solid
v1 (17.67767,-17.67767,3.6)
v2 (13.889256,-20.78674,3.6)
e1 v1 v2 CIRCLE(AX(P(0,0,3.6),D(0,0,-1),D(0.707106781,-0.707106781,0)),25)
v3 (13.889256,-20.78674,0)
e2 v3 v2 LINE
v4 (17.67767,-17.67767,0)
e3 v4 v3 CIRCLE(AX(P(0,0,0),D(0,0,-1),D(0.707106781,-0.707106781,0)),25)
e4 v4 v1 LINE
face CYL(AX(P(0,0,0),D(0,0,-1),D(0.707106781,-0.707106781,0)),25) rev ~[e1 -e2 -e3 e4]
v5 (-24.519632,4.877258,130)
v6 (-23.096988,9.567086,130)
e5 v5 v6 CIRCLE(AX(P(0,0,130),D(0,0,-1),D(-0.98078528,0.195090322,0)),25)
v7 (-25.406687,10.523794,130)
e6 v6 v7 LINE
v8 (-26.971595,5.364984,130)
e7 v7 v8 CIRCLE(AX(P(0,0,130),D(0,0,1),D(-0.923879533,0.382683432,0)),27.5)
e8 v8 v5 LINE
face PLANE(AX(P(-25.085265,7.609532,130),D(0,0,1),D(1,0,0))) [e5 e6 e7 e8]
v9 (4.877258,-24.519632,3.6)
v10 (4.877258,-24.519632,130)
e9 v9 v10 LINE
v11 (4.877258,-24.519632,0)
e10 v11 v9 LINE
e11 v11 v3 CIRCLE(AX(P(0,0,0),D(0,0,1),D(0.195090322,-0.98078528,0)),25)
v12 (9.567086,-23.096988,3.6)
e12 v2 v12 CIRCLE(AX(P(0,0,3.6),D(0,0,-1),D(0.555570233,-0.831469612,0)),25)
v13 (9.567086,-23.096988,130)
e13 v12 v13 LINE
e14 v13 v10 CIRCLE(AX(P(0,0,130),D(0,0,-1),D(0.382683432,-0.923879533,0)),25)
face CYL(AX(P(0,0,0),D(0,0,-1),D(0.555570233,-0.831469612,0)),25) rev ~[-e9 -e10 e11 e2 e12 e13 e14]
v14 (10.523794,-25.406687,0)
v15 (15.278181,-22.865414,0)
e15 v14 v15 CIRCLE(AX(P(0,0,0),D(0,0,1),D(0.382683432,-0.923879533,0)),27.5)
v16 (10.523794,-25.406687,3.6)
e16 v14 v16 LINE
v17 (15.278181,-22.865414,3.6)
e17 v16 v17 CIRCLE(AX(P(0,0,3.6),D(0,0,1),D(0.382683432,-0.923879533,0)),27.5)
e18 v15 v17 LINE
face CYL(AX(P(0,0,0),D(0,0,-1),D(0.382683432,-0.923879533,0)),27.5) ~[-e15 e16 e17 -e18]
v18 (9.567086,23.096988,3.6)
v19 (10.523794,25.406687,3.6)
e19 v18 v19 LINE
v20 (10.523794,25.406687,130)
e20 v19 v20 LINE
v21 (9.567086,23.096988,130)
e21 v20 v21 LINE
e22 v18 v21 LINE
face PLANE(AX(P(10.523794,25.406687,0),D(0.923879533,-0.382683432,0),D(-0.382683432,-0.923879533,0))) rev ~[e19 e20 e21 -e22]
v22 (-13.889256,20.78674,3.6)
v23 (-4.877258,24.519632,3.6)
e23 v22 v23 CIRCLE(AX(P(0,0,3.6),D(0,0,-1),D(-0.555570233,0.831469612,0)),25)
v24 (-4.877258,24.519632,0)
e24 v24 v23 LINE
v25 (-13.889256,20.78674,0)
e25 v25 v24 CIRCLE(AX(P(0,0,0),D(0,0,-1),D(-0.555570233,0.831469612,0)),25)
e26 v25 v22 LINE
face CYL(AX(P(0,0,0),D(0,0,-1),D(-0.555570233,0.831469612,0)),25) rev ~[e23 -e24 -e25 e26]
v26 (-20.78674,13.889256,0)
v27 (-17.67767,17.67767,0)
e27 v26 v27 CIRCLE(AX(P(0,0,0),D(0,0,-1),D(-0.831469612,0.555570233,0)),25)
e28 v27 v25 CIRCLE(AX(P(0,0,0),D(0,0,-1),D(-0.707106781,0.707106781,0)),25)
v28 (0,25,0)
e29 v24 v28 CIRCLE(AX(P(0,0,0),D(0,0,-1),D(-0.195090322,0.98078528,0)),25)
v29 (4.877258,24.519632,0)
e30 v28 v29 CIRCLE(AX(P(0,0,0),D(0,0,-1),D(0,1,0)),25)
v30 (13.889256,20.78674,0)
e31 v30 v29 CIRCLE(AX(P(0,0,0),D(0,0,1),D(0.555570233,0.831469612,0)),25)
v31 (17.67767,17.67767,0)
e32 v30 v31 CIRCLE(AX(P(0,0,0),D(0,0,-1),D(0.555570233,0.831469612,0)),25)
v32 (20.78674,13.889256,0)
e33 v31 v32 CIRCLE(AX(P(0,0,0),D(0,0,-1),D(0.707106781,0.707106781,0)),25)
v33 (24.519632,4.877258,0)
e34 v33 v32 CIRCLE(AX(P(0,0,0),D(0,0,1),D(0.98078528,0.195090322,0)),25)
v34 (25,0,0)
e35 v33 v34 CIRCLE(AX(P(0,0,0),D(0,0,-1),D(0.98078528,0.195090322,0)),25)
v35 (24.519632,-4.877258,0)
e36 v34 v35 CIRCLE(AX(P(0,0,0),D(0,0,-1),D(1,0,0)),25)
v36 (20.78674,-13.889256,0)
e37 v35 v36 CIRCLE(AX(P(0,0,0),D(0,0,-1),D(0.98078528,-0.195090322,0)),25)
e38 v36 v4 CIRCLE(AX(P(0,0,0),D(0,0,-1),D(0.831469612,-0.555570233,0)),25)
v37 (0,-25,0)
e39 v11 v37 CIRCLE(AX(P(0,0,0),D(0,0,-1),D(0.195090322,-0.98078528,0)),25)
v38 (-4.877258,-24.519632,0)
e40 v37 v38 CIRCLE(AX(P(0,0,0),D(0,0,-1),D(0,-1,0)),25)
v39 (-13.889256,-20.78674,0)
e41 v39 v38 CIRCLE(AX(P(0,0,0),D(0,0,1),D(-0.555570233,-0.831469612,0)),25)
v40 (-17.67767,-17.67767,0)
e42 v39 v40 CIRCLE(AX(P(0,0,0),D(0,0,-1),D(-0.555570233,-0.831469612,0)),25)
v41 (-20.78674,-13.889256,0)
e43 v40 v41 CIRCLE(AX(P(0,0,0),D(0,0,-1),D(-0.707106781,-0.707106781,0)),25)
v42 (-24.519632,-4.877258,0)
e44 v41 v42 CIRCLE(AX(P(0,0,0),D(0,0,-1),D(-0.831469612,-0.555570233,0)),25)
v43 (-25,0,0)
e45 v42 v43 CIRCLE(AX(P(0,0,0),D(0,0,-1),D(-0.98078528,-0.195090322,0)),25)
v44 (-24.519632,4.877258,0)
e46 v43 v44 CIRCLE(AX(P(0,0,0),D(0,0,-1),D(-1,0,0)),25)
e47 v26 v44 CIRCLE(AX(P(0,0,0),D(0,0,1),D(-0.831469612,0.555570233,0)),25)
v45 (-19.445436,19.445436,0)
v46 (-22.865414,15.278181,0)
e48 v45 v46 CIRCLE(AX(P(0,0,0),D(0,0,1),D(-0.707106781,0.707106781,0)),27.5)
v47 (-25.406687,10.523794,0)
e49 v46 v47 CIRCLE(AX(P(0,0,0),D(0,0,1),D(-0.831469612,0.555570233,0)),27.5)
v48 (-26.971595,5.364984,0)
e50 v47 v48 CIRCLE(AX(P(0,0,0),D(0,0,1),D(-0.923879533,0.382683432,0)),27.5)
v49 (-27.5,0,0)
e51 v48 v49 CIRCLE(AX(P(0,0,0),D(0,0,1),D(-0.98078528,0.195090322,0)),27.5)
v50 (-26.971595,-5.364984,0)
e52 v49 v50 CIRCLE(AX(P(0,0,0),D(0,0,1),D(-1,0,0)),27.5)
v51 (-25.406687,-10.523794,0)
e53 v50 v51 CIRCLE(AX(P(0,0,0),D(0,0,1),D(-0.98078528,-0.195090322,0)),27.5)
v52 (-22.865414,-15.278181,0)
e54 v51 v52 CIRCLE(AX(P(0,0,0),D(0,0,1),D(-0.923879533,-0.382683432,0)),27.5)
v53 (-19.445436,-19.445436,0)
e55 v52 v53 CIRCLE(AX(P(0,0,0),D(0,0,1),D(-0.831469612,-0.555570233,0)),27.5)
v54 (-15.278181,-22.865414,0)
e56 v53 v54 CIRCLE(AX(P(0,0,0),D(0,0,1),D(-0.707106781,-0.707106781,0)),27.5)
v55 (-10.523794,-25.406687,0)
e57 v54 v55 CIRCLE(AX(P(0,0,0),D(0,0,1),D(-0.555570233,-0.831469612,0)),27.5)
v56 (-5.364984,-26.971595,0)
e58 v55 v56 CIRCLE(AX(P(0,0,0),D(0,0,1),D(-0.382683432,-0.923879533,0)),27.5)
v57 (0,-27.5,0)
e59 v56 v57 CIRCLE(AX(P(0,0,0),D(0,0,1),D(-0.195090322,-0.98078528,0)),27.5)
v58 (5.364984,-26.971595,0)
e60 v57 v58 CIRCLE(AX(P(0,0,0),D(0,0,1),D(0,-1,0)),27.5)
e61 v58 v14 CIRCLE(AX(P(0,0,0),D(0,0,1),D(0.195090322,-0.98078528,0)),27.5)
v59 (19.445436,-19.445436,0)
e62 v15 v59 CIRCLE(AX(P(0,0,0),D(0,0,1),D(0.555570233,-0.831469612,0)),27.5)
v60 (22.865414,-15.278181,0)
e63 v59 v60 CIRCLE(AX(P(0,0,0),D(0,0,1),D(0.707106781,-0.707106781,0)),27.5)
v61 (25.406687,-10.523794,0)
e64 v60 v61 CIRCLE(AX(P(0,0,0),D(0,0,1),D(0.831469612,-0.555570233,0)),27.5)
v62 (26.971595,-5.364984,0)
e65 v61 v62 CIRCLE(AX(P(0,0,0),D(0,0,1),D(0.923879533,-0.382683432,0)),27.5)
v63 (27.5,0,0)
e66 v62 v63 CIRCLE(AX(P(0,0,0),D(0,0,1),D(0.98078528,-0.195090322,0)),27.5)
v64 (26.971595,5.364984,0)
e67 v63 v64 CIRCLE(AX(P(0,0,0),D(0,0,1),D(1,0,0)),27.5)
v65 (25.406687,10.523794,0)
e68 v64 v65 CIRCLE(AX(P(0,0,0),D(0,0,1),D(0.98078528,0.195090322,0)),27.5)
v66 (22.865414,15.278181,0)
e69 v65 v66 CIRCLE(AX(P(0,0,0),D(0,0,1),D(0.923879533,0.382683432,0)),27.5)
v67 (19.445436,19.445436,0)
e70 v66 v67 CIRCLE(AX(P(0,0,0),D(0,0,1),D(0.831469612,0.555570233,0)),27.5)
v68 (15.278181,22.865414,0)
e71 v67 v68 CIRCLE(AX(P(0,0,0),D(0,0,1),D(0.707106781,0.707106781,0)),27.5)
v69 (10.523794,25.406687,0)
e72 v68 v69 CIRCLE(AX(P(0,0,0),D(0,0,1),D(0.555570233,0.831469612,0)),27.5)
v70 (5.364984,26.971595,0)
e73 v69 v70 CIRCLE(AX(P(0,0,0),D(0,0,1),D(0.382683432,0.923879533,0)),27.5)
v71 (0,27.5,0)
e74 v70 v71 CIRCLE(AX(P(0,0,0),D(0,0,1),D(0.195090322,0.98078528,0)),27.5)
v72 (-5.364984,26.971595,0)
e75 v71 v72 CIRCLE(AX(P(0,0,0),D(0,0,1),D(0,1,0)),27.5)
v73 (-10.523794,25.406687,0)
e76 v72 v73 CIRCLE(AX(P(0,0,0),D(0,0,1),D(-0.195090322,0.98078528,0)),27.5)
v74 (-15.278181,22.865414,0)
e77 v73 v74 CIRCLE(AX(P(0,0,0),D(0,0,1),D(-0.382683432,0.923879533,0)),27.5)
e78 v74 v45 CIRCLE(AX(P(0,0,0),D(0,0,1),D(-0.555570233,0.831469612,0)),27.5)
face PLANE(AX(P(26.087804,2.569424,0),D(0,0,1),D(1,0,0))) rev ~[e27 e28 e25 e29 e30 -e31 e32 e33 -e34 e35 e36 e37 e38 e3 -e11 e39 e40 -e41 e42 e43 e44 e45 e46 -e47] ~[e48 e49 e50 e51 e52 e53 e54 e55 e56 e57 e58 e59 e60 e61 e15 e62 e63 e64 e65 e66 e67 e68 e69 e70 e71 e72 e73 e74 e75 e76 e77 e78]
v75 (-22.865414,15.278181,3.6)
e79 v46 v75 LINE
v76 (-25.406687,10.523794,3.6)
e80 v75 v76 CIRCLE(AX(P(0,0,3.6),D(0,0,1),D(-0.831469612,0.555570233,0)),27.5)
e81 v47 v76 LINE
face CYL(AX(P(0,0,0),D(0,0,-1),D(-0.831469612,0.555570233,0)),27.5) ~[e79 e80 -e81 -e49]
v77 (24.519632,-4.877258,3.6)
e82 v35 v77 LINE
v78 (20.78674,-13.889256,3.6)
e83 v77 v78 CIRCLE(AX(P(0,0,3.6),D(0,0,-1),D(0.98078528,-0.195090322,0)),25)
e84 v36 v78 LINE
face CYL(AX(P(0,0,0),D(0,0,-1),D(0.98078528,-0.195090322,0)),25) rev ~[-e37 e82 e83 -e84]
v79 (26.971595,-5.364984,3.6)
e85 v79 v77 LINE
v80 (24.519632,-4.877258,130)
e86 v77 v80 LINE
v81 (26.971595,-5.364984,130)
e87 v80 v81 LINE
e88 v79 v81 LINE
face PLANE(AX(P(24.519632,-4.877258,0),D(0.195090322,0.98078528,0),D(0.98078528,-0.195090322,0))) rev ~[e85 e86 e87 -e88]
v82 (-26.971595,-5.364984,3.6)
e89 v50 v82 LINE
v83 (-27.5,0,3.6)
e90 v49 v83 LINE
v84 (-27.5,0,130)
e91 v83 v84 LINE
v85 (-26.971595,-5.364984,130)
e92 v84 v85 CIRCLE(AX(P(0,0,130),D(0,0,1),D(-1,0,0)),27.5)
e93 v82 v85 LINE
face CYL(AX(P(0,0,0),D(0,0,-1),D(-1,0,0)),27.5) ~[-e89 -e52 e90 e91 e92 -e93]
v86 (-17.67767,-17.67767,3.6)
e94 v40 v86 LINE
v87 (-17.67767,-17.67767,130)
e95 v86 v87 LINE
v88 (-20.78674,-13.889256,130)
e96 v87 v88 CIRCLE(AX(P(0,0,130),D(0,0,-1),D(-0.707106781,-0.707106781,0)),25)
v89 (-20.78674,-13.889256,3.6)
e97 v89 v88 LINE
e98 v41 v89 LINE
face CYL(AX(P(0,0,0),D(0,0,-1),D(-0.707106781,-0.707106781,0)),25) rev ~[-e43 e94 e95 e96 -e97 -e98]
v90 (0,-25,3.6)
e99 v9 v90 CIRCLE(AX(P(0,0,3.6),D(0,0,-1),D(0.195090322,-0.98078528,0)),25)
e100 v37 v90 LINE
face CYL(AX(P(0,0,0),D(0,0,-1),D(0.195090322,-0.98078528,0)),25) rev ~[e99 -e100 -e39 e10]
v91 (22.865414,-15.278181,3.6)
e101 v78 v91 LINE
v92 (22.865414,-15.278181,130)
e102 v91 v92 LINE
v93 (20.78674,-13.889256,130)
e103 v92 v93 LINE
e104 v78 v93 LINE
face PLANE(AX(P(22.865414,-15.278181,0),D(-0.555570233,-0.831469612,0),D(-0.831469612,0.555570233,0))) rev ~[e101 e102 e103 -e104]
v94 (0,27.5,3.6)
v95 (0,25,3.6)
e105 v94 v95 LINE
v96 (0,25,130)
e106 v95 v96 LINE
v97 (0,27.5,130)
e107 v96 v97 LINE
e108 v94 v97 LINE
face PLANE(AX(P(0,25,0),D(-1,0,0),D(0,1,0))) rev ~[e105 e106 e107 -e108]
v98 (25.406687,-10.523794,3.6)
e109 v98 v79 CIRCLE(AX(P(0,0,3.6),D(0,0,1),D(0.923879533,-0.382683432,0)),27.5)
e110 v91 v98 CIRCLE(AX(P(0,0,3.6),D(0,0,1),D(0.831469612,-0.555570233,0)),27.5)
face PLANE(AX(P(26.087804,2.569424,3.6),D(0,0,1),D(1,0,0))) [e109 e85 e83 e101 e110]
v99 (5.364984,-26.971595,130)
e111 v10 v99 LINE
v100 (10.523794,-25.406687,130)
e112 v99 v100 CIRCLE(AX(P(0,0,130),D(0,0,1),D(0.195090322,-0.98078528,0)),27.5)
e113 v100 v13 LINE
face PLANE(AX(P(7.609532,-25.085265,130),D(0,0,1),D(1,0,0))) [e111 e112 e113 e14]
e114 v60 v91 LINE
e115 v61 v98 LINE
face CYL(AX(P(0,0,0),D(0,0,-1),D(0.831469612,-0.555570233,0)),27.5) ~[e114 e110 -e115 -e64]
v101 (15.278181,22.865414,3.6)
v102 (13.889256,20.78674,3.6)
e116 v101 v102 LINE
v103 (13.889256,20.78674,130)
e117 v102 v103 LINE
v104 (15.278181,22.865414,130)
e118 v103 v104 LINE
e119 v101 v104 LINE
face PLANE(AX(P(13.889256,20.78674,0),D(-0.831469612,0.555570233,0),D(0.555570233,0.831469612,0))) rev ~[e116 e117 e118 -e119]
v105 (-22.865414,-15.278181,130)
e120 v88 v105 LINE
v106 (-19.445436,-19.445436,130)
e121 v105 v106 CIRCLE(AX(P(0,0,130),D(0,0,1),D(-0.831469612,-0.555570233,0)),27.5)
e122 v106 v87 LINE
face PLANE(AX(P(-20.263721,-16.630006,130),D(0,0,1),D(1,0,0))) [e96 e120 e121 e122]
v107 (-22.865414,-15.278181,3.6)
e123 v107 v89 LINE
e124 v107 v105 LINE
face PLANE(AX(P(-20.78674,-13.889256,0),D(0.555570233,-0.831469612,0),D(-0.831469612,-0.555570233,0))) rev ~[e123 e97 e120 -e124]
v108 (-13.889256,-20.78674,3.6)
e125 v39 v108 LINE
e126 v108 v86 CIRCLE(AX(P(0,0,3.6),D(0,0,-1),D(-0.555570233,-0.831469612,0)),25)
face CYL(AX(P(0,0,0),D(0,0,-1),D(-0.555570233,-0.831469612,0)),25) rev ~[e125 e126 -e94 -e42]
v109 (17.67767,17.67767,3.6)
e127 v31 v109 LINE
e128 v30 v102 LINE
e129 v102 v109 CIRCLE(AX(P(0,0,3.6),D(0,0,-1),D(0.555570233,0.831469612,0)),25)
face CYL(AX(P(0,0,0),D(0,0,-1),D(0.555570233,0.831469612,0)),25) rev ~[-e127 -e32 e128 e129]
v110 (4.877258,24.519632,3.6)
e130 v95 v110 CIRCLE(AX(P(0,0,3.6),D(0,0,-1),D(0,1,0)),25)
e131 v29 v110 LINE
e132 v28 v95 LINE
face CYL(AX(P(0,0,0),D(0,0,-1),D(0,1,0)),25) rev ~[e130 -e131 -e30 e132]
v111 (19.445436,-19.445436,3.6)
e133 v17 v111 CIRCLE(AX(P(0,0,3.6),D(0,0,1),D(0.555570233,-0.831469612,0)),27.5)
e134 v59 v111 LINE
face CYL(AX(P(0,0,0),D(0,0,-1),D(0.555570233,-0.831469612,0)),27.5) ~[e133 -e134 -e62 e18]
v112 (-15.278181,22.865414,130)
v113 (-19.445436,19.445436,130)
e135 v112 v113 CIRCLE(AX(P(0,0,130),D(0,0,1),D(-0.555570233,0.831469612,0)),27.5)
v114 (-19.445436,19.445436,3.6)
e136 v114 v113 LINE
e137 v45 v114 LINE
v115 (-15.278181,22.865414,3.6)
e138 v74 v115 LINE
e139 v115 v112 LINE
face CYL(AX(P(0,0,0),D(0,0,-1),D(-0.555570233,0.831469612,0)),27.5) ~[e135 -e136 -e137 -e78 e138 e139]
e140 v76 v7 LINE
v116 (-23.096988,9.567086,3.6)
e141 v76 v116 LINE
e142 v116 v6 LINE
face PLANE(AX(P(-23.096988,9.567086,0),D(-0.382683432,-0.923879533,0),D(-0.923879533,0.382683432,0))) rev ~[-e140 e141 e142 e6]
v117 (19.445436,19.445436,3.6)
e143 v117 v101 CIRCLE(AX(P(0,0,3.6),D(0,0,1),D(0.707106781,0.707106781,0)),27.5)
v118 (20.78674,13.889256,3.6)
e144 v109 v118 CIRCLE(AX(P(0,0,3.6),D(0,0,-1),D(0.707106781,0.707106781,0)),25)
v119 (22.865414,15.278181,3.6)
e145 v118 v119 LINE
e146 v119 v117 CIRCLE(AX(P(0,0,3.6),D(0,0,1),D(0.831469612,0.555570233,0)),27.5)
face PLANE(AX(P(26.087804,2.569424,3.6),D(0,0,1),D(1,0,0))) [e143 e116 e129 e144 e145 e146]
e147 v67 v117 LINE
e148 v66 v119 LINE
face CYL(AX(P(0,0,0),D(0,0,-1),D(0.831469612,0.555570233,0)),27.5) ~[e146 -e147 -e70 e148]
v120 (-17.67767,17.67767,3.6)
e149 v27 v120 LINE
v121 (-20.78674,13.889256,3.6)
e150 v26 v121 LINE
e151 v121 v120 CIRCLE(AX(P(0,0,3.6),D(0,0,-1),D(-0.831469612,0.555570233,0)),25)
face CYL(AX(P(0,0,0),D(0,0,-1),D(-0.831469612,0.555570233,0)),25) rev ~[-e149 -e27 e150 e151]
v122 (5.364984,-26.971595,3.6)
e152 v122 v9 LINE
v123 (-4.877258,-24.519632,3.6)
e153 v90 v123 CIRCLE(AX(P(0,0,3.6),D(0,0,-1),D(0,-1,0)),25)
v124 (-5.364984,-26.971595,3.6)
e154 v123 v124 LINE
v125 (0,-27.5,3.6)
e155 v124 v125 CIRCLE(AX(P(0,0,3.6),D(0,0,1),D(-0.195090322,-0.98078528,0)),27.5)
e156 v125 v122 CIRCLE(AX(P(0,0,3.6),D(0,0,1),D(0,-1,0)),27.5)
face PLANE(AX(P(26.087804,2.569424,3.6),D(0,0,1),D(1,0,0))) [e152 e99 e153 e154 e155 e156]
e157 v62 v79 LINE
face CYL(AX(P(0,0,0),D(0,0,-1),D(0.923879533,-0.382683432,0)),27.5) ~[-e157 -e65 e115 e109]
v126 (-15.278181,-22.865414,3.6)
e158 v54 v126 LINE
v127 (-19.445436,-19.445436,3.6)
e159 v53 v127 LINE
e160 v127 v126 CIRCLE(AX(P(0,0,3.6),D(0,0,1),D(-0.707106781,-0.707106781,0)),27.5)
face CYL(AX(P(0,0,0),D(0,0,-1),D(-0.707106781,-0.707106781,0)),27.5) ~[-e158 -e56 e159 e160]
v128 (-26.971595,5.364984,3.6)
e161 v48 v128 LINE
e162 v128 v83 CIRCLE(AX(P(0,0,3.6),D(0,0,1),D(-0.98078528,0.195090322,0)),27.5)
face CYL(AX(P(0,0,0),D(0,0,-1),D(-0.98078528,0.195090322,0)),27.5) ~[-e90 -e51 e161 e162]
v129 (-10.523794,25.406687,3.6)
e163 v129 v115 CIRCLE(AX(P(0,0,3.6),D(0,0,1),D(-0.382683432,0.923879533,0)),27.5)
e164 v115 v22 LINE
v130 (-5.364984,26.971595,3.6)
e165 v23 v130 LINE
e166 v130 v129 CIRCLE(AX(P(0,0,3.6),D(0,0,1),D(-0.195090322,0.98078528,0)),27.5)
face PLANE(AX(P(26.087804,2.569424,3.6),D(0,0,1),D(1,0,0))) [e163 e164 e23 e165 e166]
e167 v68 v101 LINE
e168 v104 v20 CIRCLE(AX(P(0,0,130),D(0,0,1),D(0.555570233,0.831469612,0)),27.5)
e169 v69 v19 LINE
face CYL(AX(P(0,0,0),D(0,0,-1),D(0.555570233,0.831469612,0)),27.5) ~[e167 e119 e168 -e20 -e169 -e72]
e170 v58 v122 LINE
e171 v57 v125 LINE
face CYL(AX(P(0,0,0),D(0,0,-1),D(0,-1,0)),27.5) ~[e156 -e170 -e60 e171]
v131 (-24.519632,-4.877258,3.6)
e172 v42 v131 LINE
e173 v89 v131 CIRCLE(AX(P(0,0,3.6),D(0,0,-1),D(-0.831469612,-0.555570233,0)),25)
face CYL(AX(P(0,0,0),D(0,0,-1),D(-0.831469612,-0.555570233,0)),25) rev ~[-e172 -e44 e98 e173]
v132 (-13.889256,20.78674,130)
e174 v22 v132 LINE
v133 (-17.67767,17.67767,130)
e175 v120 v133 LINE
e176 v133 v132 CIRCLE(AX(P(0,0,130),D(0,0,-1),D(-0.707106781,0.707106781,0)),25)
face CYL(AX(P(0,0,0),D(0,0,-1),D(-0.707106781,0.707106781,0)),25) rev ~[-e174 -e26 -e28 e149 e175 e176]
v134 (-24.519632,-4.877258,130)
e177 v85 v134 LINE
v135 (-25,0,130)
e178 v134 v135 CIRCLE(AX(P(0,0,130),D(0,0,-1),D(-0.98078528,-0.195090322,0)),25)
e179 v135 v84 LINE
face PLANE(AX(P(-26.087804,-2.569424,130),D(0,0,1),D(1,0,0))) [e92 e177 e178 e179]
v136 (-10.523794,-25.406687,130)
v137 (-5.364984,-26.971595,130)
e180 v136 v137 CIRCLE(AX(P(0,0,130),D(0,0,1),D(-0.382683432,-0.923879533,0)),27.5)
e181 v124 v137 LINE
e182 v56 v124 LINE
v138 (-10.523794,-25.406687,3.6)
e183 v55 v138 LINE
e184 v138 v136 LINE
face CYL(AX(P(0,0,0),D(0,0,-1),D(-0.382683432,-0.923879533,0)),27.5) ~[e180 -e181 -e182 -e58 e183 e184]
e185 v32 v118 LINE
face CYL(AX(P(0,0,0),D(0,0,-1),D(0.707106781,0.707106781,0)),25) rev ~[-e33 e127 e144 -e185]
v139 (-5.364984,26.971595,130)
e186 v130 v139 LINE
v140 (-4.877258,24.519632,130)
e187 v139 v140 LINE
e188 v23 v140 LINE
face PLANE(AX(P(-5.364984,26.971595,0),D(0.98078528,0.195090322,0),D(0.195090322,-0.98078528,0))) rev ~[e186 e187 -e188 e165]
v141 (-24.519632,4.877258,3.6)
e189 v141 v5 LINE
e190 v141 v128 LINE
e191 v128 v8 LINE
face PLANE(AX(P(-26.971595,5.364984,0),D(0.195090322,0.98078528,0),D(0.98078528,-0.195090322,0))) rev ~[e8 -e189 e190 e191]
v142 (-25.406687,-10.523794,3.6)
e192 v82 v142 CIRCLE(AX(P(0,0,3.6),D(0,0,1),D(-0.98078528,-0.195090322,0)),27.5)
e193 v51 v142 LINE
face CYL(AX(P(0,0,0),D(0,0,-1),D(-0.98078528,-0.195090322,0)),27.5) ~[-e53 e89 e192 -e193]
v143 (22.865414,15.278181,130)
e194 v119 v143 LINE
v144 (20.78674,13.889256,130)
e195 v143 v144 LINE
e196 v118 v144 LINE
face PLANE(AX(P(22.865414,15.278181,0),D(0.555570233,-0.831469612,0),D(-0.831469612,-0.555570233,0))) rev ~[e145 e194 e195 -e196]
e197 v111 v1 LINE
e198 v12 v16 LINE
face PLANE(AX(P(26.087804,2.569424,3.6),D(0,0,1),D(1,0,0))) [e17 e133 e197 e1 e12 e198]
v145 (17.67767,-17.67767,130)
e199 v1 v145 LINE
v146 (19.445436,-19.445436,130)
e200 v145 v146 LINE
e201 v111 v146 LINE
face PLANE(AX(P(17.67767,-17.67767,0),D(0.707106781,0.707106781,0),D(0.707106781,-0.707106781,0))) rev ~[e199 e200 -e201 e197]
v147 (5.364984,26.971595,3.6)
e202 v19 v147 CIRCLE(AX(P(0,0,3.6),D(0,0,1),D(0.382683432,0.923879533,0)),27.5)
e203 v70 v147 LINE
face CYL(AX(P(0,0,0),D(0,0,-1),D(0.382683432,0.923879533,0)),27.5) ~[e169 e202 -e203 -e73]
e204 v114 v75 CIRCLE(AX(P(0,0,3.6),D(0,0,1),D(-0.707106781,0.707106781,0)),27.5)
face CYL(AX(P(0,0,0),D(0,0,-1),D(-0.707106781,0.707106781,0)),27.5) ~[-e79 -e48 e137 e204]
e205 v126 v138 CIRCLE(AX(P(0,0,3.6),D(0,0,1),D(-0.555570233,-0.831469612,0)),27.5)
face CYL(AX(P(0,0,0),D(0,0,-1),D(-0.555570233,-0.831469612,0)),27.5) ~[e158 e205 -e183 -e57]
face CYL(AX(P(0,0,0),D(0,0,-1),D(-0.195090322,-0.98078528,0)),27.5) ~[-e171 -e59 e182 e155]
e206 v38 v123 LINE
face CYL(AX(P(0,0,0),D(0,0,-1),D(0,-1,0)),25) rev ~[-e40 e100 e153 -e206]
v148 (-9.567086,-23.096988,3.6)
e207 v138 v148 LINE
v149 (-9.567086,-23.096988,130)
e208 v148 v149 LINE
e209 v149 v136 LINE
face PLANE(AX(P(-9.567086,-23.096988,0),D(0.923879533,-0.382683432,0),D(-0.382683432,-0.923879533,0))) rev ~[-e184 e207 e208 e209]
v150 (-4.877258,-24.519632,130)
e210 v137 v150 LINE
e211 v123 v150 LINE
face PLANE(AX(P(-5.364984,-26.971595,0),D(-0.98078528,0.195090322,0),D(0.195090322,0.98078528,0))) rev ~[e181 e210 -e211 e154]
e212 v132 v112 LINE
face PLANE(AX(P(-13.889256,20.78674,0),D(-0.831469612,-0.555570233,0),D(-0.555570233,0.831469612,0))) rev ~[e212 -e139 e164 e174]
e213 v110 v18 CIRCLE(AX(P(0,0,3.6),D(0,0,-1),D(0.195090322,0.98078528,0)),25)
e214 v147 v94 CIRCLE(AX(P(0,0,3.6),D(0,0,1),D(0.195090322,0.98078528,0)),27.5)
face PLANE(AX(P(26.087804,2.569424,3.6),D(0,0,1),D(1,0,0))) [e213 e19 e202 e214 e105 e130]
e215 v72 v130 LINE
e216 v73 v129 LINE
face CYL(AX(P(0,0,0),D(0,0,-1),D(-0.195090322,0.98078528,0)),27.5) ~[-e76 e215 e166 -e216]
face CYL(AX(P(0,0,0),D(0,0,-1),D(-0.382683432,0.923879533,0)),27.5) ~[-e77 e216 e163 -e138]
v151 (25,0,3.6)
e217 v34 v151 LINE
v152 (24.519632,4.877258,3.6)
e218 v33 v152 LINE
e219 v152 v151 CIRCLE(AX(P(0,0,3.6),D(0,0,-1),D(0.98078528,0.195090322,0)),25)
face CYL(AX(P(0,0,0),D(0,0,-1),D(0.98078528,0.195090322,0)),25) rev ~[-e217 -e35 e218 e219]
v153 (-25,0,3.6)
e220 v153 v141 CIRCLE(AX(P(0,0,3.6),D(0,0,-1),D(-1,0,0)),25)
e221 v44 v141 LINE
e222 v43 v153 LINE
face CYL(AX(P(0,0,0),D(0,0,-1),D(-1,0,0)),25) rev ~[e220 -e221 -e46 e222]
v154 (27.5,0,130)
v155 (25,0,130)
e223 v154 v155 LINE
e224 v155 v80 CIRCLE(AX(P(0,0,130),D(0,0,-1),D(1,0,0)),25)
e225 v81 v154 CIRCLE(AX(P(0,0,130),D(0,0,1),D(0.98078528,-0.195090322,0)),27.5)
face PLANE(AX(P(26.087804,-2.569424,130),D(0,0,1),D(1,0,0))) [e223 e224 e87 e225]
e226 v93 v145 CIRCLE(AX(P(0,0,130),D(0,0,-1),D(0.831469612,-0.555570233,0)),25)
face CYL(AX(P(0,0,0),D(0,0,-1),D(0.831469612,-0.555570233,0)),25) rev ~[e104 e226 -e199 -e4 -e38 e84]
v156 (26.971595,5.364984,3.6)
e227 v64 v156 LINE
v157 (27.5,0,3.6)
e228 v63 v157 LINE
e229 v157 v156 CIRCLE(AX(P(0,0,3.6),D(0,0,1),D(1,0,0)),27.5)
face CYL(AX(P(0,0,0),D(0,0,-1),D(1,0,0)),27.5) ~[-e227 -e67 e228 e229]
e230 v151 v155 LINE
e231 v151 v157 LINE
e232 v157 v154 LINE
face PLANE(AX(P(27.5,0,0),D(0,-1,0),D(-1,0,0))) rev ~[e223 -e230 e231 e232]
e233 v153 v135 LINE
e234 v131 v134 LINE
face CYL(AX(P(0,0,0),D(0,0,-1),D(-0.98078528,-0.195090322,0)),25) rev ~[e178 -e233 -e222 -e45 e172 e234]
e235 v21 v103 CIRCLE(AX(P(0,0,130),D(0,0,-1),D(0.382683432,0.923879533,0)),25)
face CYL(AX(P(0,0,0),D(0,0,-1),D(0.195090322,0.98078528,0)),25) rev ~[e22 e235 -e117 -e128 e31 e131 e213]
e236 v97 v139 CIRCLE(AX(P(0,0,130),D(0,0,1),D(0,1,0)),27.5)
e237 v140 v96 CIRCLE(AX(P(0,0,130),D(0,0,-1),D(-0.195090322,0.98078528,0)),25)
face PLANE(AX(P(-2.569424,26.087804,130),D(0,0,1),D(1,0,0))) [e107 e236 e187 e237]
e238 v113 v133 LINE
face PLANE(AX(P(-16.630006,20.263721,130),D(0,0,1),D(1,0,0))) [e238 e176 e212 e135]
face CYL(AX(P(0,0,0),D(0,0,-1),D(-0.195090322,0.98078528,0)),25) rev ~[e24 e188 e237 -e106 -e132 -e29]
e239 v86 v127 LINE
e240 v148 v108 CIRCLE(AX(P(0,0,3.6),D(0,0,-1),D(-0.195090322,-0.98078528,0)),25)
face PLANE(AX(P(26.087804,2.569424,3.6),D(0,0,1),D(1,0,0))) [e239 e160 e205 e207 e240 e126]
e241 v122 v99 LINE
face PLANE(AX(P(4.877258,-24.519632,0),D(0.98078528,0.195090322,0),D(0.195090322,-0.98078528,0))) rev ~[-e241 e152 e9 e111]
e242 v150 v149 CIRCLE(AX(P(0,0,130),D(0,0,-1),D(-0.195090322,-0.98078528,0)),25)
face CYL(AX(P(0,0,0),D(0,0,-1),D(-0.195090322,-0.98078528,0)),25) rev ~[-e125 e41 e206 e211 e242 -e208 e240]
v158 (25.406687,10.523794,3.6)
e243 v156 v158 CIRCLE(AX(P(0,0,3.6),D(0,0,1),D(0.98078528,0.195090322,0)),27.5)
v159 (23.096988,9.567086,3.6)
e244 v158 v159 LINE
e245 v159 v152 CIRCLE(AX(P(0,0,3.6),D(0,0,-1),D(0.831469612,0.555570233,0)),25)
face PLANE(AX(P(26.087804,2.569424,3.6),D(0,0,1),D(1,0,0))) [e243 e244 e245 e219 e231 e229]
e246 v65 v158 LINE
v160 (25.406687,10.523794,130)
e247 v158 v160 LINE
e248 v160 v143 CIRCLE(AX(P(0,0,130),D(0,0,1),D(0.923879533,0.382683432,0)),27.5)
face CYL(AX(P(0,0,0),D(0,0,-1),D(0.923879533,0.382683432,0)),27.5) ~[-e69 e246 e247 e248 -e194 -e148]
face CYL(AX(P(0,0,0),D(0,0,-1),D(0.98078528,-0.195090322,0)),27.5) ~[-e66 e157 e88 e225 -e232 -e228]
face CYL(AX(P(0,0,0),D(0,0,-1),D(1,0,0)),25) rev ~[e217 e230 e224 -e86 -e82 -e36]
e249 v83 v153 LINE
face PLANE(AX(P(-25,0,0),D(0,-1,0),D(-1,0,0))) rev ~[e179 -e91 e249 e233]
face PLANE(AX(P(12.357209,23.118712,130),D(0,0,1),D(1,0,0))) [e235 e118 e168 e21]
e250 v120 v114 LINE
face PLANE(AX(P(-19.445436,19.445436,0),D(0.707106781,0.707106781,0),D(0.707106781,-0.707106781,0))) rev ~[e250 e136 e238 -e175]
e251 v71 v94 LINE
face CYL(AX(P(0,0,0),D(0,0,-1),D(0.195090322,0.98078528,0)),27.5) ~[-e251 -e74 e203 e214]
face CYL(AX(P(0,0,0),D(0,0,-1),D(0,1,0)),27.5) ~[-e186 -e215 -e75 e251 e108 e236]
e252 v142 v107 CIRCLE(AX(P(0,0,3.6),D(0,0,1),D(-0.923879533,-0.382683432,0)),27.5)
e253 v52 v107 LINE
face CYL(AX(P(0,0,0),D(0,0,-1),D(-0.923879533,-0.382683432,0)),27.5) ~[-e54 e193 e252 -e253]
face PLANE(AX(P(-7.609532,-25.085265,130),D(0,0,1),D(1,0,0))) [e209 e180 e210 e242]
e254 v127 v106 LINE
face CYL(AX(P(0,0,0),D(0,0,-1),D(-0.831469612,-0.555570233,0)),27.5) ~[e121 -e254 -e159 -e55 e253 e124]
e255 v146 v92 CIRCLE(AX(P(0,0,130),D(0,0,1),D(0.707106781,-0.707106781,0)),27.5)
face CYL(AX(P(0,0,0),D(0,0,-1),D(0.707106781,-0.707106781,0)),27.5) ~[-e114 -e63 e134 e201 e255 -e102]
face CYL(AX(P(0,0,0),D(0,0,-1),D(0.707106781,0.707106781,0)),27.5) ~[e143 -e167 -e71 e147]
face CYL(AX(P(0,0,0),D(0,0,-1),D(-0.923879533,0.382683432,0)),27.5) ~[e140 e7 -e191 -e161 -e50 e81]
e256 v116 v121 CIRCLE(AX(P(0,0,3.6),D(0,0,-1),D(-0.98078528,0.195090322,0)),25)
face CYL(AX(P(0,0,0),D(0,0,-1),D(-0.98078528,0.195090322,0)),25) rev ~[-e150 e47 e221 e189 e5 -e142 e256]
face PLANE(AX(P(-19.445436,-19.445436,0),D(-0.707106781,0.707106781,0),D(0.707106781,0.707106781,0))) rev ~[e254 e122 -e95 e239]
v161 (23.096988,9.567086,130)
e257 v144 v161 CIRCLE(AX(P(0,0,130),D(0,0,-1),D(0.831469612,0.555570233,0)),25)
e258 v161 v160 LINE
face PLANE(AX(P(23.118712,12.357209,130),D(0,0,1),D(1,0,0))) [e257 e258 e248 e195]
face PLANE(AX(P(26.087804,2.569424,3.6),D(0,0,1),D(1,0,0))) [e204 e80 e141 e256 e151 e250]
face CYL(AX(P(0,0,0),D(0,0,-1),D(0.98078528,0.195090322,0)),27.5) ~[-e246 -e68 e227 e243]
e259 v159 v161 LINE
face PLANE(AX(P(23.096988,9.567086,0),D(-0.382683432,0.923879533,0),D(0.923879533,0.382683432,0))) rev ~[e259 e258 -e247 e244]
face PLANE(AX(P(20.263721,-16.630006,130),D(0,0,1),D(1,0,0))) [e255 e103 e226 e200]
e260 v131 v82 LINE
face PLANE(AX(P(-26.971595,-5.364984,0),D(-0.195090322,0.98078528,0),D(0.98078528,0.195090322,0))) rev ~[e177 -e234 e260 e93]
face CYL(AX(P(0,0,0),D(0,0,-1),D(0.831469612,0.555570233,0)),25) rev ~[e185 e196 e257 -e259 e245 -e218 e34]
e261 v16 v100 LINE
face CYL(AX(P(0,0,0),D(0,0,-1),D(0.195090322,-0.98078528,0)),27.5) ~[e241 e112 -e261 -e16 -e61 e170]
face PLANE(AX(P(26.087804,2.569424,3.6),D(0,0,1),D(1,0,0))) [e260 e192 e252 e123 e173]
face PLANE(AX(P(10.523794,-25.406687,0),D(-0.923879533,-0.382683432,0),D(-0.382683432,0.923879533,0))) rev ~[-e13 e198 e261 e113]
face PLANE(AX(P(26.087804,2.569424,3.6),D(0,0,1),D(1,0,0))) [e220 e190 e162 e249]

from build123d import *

# Parameters (mm, degrees)
F2_DEPTH = 3.6
F3_DEPTH = 130


with BuildPart() as f2:
    # F1 (on Top) → F2 (new body)
    with BuildSketch(Plane.XY):
        with BuildLine():
            Line((25, 0), (27.5, 0))
            ThreePointArc((27.5, 0), (27.3675799835, 2.6954713591), (26.9715952111, 5.3649838554))
            Line((26.9715952111, 5.3649838554), (24.5196320101, 4.8772580504))
            ThreePointArc((24.5196320101, 4.8772580504), (24.8796181668, 2.4504285082), (25, 0))
        make_face()
        with BuildLine():
            ThreePointArc((26.9715952111, -5.3649838554), (27.3675799835, -2.6954713591), (27.5, 0))
            Line((27.5, 0), (25, 0))
            ThreePointArc((25, 0), (24.8796181668, -2.4504285082), (24.5196320101, -4.8772580504))
            Line((24.5196320101, -4.8772580504), (26.9715952111, -5.3649838554))
        make_face()
        with BuildLine():
            Line((24.5196320101, 4.8772580504), (26.9715952111, 5.3649838554))
            ThreePointArc((26.9715952111, 5.3649838554), (26.3158592326, 7.9828286245), (25.4066871441, 10.52379439))
            Line((25.4066871441, 10.52379439), (23.0969883128, 9.5670858091))
            ThreePointArc((23.0969883128, 9.5670858091), (23.9235083933, 7.2571169314), (24.5196320101, 4.8772580504))
        make_face()
        with BuildLine():
            ThreePointArc((25.4066871441, -10.52379439), (26.3158592326, -7.9828286245), (26.9715952111, -5.3649838554))
            Line((26.9715952111, -5.3649838554), (24.5196320101, -4.8772580504))
            ThreePointArc((24.5196320101, -4.8772580504), (23.9235083933, -7.2571169314), (23.0969883128, -9.5670858091))
            Line((23.0969883128, -9.5670858091), (25.4066871441, -10.52379439))
        make_face()
        with BuildLine():
            Line((23.0969883128, 9.5670858091), (25.4066871441, 10.52379439))
            ThreePointArc((25.4066871441, 10.52379439), (24.2528347696, 12.9634102627), (22.8654143383, 15.278181408))
            Line((22.8654143383, 15.278181408), (20.7867403076, 13.8892558255))
            ThreePointArc((20.7867403076, 13.8892558255), (22.0480316087, 11.7849184207), (23.0969883128, 9.5670858091))
        make_face()
        with BuildLine():
            ThreePointArc((22.8654143383, -15.278181408), (24.2528347696, -12.9634102627), (25.4066871441, -10.52379439))
            Line((25.4066871441, -10.52379439), (23.0969883128, -9.5670858091))
            ThreePointArc((23.0969883128, -9.5670858091), (22.0480316087, -11.7849184207), (20.7867403076, -13.8892558255))
            Line((20.7867403076, -13.8892558255), (22.8654143383, -15.278181408))
        make_face()
        with BuildLine():
            Line((20.7867403076, 13.8892558255), (22.8654143383, 15.278181408))
            ThreePointArc((22.8654143383, 15.278181408), (21.2577874675, 17.4458153145), (19.4454364826, 19.4454364826))
            Line((19.4454364826, 19.4454364826), (17.6776695297, 17.6776695297))
            ThreePointArc((17.6776695297, 17.6776695297), (19.3252613341, 15.8598321041), (20.7867403076, 13.8892558255))
        make_face()
        with BuildLine():
            ThreePointArc((19.4454364826, -19.4454364826), (21.2577874675, -17.4458153145), (22.8654143383, -15.278181408))
            Line((22.8654143383, -15.278181408), (20.7867403076, -13.8892558255))
            ThreePointArc((20.7867403076, -13.8892558255), (19.3252613341, -15.8598321041), (17.6776695297, -17.6776695297))
            Line((17.6776695297, -17.6776695297), (19.4454364826, -19.4454364826))
        make_face()
        with BuildLine():
            Line((0, 27.5), (0, 25))
            ThreePointArc((0, 25), (2.4504285082, 24.8796181668), (4.8772580504, 24.5196320101))
            Line((4.8772580504, 24.5196320101), (5.3649838554, 26.9715952111))
            ThreePointArc((5.3649838554, 26.9715952111), (2.6954713591, 27.3675799835), (0, 27.5))
        make_face()
        with BuildLine():
            ThreePointArc((-4.8772580504, 24.5196320101), (-2.4504285082, 24.8796181668), (0, 25))
            Line((0, 25), (0, 27.5))
            ThreePointArc((0, 27.5), (-2.6954713591, 27.3675799835), (-5.3649838554, 26.9715952111))
            Line((-5.3649838554, 26.9715952111), (-4.8772580504, 24.5196320101))
        make_face()
        with BuildLine():
            Line((0, -27.5), (0, -25))
            ThreePointArc((0, -25), (-2.4504285082, -24.8796181668), (-4.8772580504, -24.5196320101))
            Line((-4.8772580504, -24.5196320101), (-5.3649838554, -26.9715952111))
            ThreePointArc((-5.3649838554, -26.9715952111), (-2.6954713591, -27.3675799835), (0, -27.5))
        make_face()
        with BuildLine():
            ThreePointArc((4.8772580504, -24.5196320101), (2.4504285082, -24.8796181668), (0, -25))
            Line((0, -25), (0, -27.5))
            ThreePointArc((0, -27.5), (2.6954713591, -27.3675799835), (5.3649838554, -26.9715952111))
            Line((5.3649838554, -26.9715952111), (4.8772580504, -24.5196320101))
        make_face()
        with BuildLine():
            Line((-27.5, 0), (-25, 0))
            ThreePointArc((-25, 0), (-24.8796181668, 2.4504285082), (-24.5196320101, 4.8772580504))
            Line((-24.5196320101, 4.8772580504), (-26.9715952111, 5.3649838554))
            ThreePointArc((-26.9715952111, 5.3649838554), (-27.3675799835, 2.6954713591), (-27.5, 0))
        make_face()
        with BuildLine():
            ThreePointArc((-24.5196320101, -4.8772580504), (-24.8796181668, -2.4504285082), (-25, 0))
            Line((-25, 0), (-27.5, 0))
            ThreePointArc((-27.5, 0), (-27.3675799835, -2.6954713591), (-26.9715952111, -5.3649838554))
            Line((-26.9715952111, -5.3649838554), (-24.5196320101, -4.8772580504))
        make_face()
        with BuildLine():
            Line((19.4454364826, -19.4454364826), (17.6776695297, -17.6776695297))
            ThreePointArc((17.6776695297, -17.6776695297), (15.8598321041, -19.3252613341), (13.8892558255, -20.7867403076))
            Line((13.8892558255, -20.7867403076), (15.278181408, -22.8654143383))
            ThreePointArc((15.278181408, -22.8654143383), (17.4458153145, -21.2577874675), (19.4454364826, -19.4454364826))
        make_face()
        with BuildLine():
            Line((10.52379439, -25.4066871441), (9.5670858091, -23.0969883128))
            ThreePointArc((9.5670858091, -23.0969883128), (7.2571169314, -23.9235083933), (4.8772580504, -24.5196320101))
            Line((4.8772580504, -24.5196320101), (5.3649838554, -26.9715952111))
            ThreePointArc((5.3649838554, -26.9715952111), (7.9828286245, -26.3158592326), (10.52379439, -25.4066871441))
        make_face()
        with BuildLine():
            ThreePointArc((13.8892558255, -20.7867403076), (11.7849184207, -22.0480316087), (9.5670858091, -23.0969883128))
            Line((9.5670858091, -23.0969883128), (10.52379439, -25.4066871441))
            ThreePointArc((10.52379439, -25.4066871441), (12.9634102627, -24.2528347696), (15.278181408, -22.8654143383))
            Line((15.278181408, -22.8654143383), (13.8892558255, -20.7867403076))
        make_face()
        with BuildLine():
            Line((-5.3649838554, -26.9715952111), (-4.8772580504, -24.5196320101))
            ThreePointArc((-4.8772580504, -24.5196320101), (-7.2571169314, -23.9235083933), (-9.5670858091, -23.0969883128))
            Line((-9.5670858091, -23.0969883128), (-10.52379439, -25.4066871441))
            ThreePointArc((-10.52379439, -25.4066871441), (-7.9828286245, -26.3158592326), (-5.3649838554, -26.9715952111))
        make_face()
        with BuildLine():
            Line((-10.52379439, -25.4066871441), (-9.5670858091, -23.0969883128))
            ThreePointArc((-9.5670858091, -23.0969883128), (-11.7849184207, -22.0480316087), (-13.8892558255, -20.7867403076))
            Line((-13.8892558255, -20.7867403076), (-15.278181408, -22.8654143383))
            ThreePointArc((-15.278181408, -22.8654143383), (-12.9634102627, -24.2528347696), (-10.52379439, -25.4066871441))
        make_face()
        with BuildLine():
            Line((-15.278181408, -22.8654143383), (-13.8892558255, -20.7867403076))
            ThreePointArc((-13.8892558255, -20.7867403076), (-15.8598321041, -19.3252613341), (-17.6776695297, -17.6776695297))
            Line((-17.6776695297, -17.6776695297), (-19.4454364826, -19.4454364826))
            ThreePointArc((-19.4454364826, -19.4454364826), (-17.4458153145, -21.2577874675), (-15.278181408, -22.8654143383))
        make_face()
        with BuildLine():
            Line((-19.4454364826, -19.4454364826), (-17.6776695297, -17.6776695297))
            ThreePointArc((-17.6776695297, -17.6776695297), (-19.3252613341, -15.8598321041), (-20.7867403076, -13.8892558255))
            Line((-20.7867403076, -13.8892558255), (-22.8654143383, -15.278181408))
            ThreePointArc((-22.8654143383, -15.278181408), (-21.2577874675, -17.4458153145), (-19.4454364826, -19.4454364826))
        make_face()
        with BuildLine():
            Line((-22.8654143383, -15.278181408), (-20.7867403076, -13.8892558255))
            ThreePointArc((-20.7867403076, -13.8892558255), (-22.0480316087, -11.7849184207), (-23.0969883128, -9.5670858091))
            Line((-23.0969883128, -9.5670858091), (-25.4066871441, -10.52379439))
            ThreePointArc((-25.4066871441, -10.52379439), (-24.2528347696, -12.9634102627), (-22.8654143383, -15.278181408))
        make_face()
        with BuildLine():
            Line((-25.4066871441, -10.52379439), (-23.0969883128, -9.5670858091))
            ThreePointArc((-23.0969883128, -9.5670858091), (-23.9235083933, -7.2571169314), (-24.5196320101, -4.8772580504))
            Line((-24.5196320101, -4.8772580504), (-26.9715952111, -5.3649838554))
            ThreePointArc((-26.9715952111, -5.3649838554), (-26.3158592326, -7.9828286245), (-25.4066871441, -10.52379439))
        make_face()
        with BuildLine():
            Line((-26.9715952111, 5.3649838554), (-24.5196320101, 4.8772580504))
            ThreePointArc((-24.5196320101, 4.8772580504), (-23.9235083933, 7.2571169314), (-23.0969883128, 9.5670858091))
            Line((-23.0969883128, 9.5670858091), (-25.4066871441, 10.52379439))
            ThreePointArc((-25.4066871441, 10.52379439), (-26.3158592326, 7.9828286245), (-26.9715952111, 5.3649838554))
        make_face()
        with BuildLine():
            Line((-25.4066871441, 10.52379439), (-23.0969883128, 9.5670858091))
            ThreePointArc((-23.0969883128, 9.5670858091), (-22.0480316087, 11.7849184207), (-20.7867403076, 13.8892558255))
            Line((-20.7867403076, 13.8892558255), (-22.8654143383, 15.278181408))
            ThreePointArc((-22.8654143383, 15.278181408), (-24.2528347696, 12.9634102627), (-25.4066871441, 10.52379439))
        make_face()
        with BuildLine():
            Line((-22.8654143383, 15.278181408), (-20.7867403076, 13.8892558255))
            ThreePointArc((-20.7867403076, 13.8892558255), (-19.3252613341, 15.8598321041), (-17.6776695297, 17.6776695297))
            Line((-17.6776695297, 17.6776695297), (-19.4454364826, 19.4454364826))
            ThreePointArc((-19.4454364826, 19.4454364826), (-21.2577874675, 17.4458153145), (-22.8654143383, 15.278181408))
        make_face()
        with BuildLine():
            Line((-19.4454364826, 19.4454364826), (-17.6776695297, 17.6776695297))
            ThreePointArc((-17.6776695297, 17.6776695297), (-15.8598321041, 19.3252613341), (-13.8892558255, 20.7867403076))
            Line((-13.8892558255, 20.7867403076), (-15.278181408, 22.8654143383))
            ThreePointArc((-15.278181408, 22.8654143383), (-17.4458153145, 21.2577874675), (-19.4454364826, 19.4454364826))
        make_face()
        with BuildLine():
            Line((-15.278181408, 22.8654143383), (-13.8892558255, 20.7867403076))
            ThreePointArc((-13.8892558255, 20.7867403076), (-11.7849184207, 22.0480316087), (-9.5670858091, 23.0969883128))
            Line((-9.5670858091, 23.0969883128), (-10.52379439, 25.4066871441))
            ThreePointArc((-10.52379439, 25.4066871441), (-12.9634102627, 24.2528347696), (-15.278181408, 22.8654143383))
        make_face()
        with BuildLine():
            Line((-10.52379439, 25.4066871441), (-9.5670858091, 23.0969883128))
            ThreePointArc((-9.5670858091, 23.0969883128), (-7.2571169314, 23.9235083933), (-4.8772580504, 24.5196320101))
            Line((-4.8772580504, 24.5196320101), (-5.3649838554, 26.9715952111))
            ThreePointArc((-5.3649838554, 26.9715952111), (-7.9828286245, 26.3158592326), (-10.52379439, 25.4066871441))
        make_face()
        with BuildLine():
            ThreePointArc((13.8892558255, 20.7867403076), (15.8598321041, 19.3252613341), (17.6776695297, 17.6776695297))
            Line((17.6776695297, 17.6776695297), (19.4454364826, 19.4454364826))
            ThreePointArc((19.4454364826, 19.4454364826), (17.4458153145, 21.2577874675), (15.278181408, 22.8654143383))
            Line((15.278181408, 22.8654143383), (13.8892558255, 20.7867403076))
        make_face()
        with BuildLine():
            ThreePointArc((9.5670858091, 23.0969883128), (11.7849184207, 22.0480316087), (13.8892558255, 20.7867403076))
            Line((13.8892558255, 20.7867403076), (15.278181408, 22.8654143383))
            ThreePointArc((15.278181408, 22.8654143383), (12.9634102627, 24.2528347696), (10.52379439, 25.4066871441))
            Line((10.52379439, 25.4066871441), (9.5670858091, 23.0969883128))
        make_face()
        with BuildLine():
            ThreePointArc((4.8772580504, 24.5196320101), (7.2571169314, 23.9235083933), (9.5670858091, 23.0969883128))
            Line((9.5670858091, 23.0969883128), (10.52379439, 25.4066871441))
            ThreePointArc((10.52379439, 25.4066871441), (7.9828286245, 26.3158592326), (5.3649838554, 26.9715952111))
            Line((5.3649838554, 26.9715952111), (4.8772580504, 24.5196320101))
        make_face()
    extrude(amount=F2_DEPTH)

    # F1 (on Top) → F3 (join)
    with BuildSketch(Plane.XY):
        with BuildLine():
            ThreePointArc((26.9715952111, -5.3649838554), (27.3675799835, -2.6954713591), (27.5, 0))
            Line((27.5, 0), (25, 0))
            ThreePointArc((25, 0), (24.8796181668, -2.4504285082), (24.5196320101, -4.8772580504))
            Line((24.5196320101, -4.8772580504), (26.9715952111, -5.3649838554))
        make_face()
        with BuildLine():
            ThreePointArc((19.4454364826, -19.4454364826), (21.2577874675, -17.4458153145), (22.8654143383, -15.278181408))
            Line((22.8654143383, -15.278181408), (20.7867403076, -13.8892558255))
            ThreePointArc((20.7867403076, -13.8892558255), (19.3252613341, -15.8598321041), (17.6776695297, -17.6776695297))
            Line((17.6776695297, -17.6776695297), (19.4454364826, -19.4454364826))
        make_face()
        with BuildLine():
            Line((10.52379439, -25.4066871441), (9.5670858091, -23.0969883128))
            ThreePointArc((9.5670858091, -23.0969883128), (7.2571169314, -23.9235083933), (4.8772580504, -24.5196320101))
            Line((4.8772580504, -24.5196320101), (5.3649838554, -26.9715952111))
            ThreePointArc((5.3649838554, -26.9715952111), (7.9828286245, -26.3158592326), (10.52379439, -25.4066871441))
        make_face()
        with BuildLine():
            Line((23.0969883128, 9.5670858091), (25.4066871441, 10.52379439))
            ThreePointArc((25.4066871441, 10.52379439), (24.2528347696, 12.9634102627), (22.8654143383, 15.278181408))
            Line((22.8654143383, 15.278181408), (20.7867403076, 13.8892558255))
            ThreePointArc((20.7867403076, 13.8892558255), (22.0480316087, 11.7849184207), (23.0969883128, 9.5670858091))
        make_face()
        with BuildLine():
            ThreePointArc((9.5670858091, 23.0969883128), (11.7849184207, 22.0480316087), (13.8892558255, 20.7867403076))
            Line((13.8892558255, 20.7867403076), (15.278181408, 22.8654143383))
            ThreePointArc((15.278181408, 22.8654143383), (12.9634102627, 24.2528347696), (10.52379439, 25.4066871441))
            Line((10.52379439, 25.4066871441), (9.5670858091, 23.0969883128))
        make_face()
        with BuildLine():
            ThreePointArc((-4.8772580504, 24.5196320101), (-2.4504285082, 24.8796181668), (0, 25))
            Line((0, 25), (0, 27.5))
            ThreePointArc((0, 27.5), (-2.6954713591, 27.3675799835), (-5.3649838554, 26.9715952111))
            Line((-5.3649838554, 26.9715952111), (-4.8772580504, 24.5196320101))
        make_face()
        with BuildLine():
            Line((-5.3649838554, -26.9715952111), (-4.8772580504, -24.5196320101))
            ThreePointArc((-4.8772580504, -24.5196320101), (-7.2571169314, -23.9235083933), (-9.5670858091, -23.0969883128))
            Line((-9.5670858091, -23.0969883128), (-10.52379439, -25.4066871441))
            ThreePointArc((-10.52379439, -25.4066871441), (-7.9828286245, -26.3158592326), (-5.3649838554, -26.9715952111))
        make_face()
        with BuildLine():
            Line((-19.4454364826, 19.4454364826), (-17.6776695297, 17.6776695297))
            ThreePointArc((-17.6776695297, 17.6776695297), (-15.8598321041, 19.3252613341), (-13.8892558255, 20.7867403076))
            Line((-13.8892558255, 20.7867403076), (-15.278181408, 22.8654143383))
            ThreePointArc((-15.278181408, 22.8654143383), (-17.4458153145, 21.2577874675), (-19.4454364826, 19.4454364826))
        make_face()
        with BuildLine():
            Line((-26.9715952111, 5.3649838554), (-24.5196320101, 4.8772580504))
            ThreePointArc((-24.5196320101, 4.8772580504), (-23.9235083933, 7.2571169314), (-23.0969883128, 9.5670858091))
            Line((-23.0969883128, 9.5670858091), (-25.4066871441, 10.52379439))
            ThreePointArc((-25.4066871441, 10.52379439), (-26.3158592326, 7.9828286245), (-26.9715952111, 5.3649838554))
        make_face()
        with BuildLine():
            Line((-19.4454364826, -19.4454364826), (-17.6776695297, -17.6776695297))
            ThreePointArc((-17.6776695297, -17.6776695297), (-19.3252613341, -15.8598321041), (-20.7867403076, -13.8892558255))
            Line((-20.7867403076, -13.8892558255), (-22.8654143383, -15.278181408))
            ThreePointArc((-22.8654143383, -15.278181408), (-21.2577874675, -17.4458153145), (-19.4454364826, -19.4454364826))
        make_face()
        with BuildLine():
            ThreePointArc((-24.5196320101, -4.8772580504), (-24.8796181668, -2.4504285082), (-25, 0))
            Line((-25, 0), (-27.5, 0))
            ThreePointArc((-27.5, 0), (-27.3675799835, -2.6954713591), (-26.9715952111, -5.3649838554))
            Line((-26.9715952111, -5.3649838554), (-24.5196320101, -4.8772580504))
        make_face()
    extrude(amount=F3_DEPTH)


solid = f2.part
